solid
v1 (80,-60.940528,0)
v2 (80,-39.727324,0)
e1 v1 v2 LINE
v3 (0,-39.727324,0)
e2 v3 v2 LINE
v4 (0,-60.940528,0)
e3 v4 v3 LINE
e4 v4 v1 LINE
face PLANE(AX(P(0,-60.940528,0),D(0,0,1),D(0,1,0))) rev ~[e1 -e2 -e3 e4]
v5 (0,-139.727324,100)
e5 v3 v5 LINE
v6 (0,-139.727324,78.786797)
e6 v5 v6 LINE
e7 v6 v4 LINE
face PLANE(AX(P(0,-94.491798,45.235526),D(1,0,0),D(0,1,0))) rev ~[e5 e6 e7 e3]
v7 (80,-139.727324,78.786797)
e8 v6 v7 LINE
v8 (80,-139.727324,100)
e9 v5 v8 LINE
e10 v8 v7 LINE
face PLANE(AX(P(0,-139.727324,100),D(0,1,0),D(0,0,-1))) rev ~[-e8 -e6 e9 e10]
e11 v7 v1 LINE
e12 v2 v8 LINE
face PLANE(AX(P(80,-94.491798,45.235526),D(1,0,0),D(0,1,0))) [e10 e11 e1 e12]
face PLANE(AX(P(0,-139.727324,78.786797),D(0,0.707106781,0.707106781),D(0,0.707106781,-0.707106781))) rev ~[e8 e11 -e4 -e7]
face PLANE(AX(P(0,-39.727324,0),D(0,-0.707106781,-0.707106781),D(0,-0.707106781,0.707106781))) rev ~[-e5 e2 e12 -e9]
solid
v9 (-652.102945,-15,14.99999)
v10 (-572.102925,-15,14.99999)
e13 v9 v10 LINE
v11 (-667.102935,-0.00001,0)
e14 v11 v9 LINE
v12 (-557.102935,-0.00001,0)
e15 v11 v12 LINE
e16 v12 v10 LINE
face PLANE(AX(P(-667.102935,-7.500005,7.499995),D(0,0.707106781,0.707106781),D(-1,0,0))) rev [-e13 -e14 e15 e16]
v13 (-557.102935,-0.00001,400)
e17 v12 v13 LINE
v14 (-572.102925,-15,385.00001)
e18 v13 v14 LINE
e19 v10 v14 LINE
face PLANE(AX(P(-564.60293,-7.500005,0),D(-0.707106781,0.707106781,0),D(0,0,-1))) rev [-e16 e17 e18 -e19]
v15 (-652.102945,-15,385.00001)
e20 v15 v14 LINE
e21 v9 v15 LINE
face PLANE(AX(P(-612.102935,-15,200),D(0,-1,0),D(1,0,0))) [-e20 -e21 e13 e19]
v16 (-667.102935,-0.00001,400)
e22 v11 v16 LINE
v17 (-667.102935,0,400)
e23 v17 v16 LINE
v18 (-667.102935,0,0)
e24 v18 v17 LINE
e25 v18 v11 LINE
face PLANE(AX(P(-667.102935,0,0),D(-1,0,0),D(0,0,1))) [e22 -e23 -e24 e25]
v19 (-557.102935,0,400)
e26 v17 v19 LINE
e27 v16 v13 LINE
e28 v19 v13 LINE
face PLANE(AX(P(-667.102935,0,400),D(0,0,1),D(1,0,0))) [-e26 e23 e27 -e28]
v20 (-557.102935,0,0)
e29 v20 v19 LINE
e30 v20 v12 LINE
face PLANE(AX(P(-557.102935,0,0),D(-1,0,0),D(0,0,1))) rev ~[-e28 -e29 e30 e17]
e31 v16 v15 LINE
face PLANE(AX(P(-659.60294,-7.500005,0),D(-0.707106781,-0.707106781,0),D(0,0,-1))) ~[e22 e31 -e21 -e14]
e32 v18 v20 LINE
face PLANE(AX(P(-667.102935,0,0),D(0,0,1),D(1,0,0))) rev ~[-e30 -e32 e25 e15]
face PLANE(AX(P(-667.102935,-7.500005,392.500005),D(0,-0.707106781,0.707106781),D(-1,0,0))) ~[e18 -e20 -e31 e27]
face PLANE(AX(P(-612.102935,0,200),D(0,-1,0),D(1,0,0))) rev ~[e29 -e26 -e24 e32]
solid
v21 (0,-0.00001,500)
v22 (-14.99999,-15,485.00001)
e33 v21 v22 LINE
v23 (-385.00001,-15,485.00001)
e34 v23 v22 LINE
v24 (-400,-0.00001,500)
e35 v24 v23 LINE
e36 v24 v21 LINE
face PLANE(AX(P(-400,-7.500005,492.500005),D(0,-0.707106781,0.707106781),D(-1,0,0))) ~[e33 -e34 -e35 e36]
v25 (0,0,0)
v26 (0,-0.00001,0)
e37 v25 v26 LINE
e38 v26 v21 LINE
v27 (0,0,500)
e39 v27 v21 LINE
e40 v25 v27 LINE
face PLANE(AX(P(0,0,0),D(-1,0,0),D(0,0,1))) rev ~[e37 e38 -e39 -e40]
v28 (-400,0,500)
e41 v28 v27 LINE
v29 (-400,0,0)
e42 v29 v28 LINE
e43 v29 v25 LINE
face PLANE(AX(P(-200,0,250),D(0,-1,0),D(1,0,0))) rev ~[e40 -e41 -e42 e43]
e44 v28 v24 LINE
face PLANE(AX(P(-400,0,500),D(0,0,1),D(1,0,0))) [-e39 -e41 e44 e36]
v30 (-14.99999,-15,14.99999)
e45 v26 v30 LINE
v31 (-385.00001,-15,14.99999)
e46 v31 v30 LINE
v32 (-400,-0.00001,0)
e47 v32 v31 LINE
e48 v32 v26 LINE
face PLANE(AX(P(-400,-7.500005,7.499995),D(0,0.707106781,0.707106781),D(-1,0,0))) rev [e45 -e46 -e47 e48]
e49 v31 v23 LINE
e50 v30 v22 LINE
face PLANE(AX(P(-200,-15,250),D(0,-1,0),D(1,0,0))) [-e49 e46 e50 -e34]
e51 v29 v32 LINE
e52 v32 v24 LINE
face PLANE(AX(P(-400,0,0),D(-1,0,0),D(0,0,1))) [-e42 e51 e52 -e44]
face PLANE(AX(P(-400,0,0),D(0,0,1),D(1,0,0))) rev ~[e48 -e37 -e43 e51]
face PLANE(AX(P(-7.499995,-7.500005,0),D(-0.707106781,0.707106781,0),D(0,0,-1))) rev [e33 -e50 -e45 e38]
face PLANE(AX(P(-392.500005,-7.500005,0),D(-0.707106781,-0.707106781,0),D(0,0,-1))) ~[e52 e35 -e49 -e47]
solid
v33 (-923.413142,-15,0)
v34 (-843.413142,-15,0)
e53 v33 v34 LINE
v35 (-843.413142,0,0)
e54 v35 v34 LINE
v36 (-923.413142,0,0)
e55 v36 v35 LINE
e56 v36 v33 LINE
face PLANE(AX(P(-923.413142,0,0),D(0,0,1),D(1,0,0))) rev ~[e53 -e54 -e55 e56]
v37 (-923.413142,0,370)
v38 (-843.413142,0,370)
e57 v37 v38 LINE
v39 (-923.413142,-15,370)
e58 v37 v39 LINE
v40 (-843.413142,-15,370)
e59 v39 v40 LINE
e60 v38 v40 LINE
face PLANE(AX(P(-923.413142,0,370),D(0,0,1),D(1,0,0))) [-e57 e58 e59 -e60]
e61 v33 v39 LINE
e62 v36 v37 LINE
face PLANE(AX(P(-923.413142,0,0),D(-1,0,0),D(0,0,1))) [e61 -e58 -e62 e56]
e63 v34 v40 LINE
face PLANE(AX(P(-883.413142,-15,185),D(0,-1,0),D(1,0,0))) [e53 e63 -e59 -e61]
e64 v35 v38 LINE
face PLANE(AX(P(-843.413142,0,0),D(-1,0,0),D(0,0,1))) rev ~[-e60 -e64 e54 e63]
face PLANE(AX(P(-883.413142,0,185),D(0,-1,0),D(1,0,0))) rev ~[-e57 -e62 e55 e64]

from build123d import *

# Parameters (mm, degrees)
F0_W      = 400
F0_H      = 500
F1_DEPTH  = 15
F2_W      = 110
F2_H      = 400
F3_DEPTH  = 15
F4_SIZE   = 14.99999
F4_2_SIZE = 14.99999
F5_W      = 80
F5_H      = 370
F6_DEPTH  = 15
F8_DEPTH  = 80


# Not quite as in the source:
# - a fillet or chamfer is up to 0.001 mm smaller than in the source, because OpenCascade refuses the exact size


with BuildPart() as f1:
    # F0 (on Front) → F1 (new body)
    with BuildSketch(Plane.XZ):
        with Locations((-200, 250)):
            Rectangle(F0_W, F0_H)
    extrude(amount=F1_DEPTH)

    # F4 (size 15 in the source; OpenCascade refuses exactly that, so slightly less here)
    f4_edges = [f1.edges().sort_by_distance(p)[0] for p in [
        (-200, -15, 0),
        (0, -15, 250),
        (-200, -15, 500),
        (-400, -15, 250),
    ]]
    chamfer(f4_edges, length=F4_SIZE)


with BuildPart() as f3:
    # F2 (on Front) → F3 (new body)
    with BuildSketch(Plane.XZ):
        with Locations((-612.1029348396, 200)):
            Rectangle(F2_W, F2_H)
    extrude(amount=F3_DEPTH)

    # F4#2 (size 15 in the source; OpenCascade refuses exactly that, so slightly less here)
    f4_2_edges = [f3.edges().sort_by_distance(p)[0] for p in [
        (-612.102935, -15, 0),
        (-557.102935, -15, 200),
        (-612.102935, -15, 400),
        (-667.102935, -15, 200),
    ]]
    chamfer(f4_2_edges, length=F4_2_SIZE)


with BuildPart() as f6:
    # F5 (on Front) → F6 (new body)
    with BuildSketch(Plane.XZ):
        with Locations((-883.413142176, 185)):
            Rectangle(F5_W, F5_H)
    extrude(amount=F6_DEPTH)


with BuildPart() as f8:
    # F7 (on Right) → F8 (new body)
    with BuildSketch(Plane.YZ):
        Polygon((-60.940527683, 0), (-39.7273242474, 0), (-139.7273242474, 100), (-139.7273242474, 78.7867965644), align=None)
    extrude(amount=F8_DEPTH)


solid = Compound([f1.part, f3.part, f6.part, f8.part])
